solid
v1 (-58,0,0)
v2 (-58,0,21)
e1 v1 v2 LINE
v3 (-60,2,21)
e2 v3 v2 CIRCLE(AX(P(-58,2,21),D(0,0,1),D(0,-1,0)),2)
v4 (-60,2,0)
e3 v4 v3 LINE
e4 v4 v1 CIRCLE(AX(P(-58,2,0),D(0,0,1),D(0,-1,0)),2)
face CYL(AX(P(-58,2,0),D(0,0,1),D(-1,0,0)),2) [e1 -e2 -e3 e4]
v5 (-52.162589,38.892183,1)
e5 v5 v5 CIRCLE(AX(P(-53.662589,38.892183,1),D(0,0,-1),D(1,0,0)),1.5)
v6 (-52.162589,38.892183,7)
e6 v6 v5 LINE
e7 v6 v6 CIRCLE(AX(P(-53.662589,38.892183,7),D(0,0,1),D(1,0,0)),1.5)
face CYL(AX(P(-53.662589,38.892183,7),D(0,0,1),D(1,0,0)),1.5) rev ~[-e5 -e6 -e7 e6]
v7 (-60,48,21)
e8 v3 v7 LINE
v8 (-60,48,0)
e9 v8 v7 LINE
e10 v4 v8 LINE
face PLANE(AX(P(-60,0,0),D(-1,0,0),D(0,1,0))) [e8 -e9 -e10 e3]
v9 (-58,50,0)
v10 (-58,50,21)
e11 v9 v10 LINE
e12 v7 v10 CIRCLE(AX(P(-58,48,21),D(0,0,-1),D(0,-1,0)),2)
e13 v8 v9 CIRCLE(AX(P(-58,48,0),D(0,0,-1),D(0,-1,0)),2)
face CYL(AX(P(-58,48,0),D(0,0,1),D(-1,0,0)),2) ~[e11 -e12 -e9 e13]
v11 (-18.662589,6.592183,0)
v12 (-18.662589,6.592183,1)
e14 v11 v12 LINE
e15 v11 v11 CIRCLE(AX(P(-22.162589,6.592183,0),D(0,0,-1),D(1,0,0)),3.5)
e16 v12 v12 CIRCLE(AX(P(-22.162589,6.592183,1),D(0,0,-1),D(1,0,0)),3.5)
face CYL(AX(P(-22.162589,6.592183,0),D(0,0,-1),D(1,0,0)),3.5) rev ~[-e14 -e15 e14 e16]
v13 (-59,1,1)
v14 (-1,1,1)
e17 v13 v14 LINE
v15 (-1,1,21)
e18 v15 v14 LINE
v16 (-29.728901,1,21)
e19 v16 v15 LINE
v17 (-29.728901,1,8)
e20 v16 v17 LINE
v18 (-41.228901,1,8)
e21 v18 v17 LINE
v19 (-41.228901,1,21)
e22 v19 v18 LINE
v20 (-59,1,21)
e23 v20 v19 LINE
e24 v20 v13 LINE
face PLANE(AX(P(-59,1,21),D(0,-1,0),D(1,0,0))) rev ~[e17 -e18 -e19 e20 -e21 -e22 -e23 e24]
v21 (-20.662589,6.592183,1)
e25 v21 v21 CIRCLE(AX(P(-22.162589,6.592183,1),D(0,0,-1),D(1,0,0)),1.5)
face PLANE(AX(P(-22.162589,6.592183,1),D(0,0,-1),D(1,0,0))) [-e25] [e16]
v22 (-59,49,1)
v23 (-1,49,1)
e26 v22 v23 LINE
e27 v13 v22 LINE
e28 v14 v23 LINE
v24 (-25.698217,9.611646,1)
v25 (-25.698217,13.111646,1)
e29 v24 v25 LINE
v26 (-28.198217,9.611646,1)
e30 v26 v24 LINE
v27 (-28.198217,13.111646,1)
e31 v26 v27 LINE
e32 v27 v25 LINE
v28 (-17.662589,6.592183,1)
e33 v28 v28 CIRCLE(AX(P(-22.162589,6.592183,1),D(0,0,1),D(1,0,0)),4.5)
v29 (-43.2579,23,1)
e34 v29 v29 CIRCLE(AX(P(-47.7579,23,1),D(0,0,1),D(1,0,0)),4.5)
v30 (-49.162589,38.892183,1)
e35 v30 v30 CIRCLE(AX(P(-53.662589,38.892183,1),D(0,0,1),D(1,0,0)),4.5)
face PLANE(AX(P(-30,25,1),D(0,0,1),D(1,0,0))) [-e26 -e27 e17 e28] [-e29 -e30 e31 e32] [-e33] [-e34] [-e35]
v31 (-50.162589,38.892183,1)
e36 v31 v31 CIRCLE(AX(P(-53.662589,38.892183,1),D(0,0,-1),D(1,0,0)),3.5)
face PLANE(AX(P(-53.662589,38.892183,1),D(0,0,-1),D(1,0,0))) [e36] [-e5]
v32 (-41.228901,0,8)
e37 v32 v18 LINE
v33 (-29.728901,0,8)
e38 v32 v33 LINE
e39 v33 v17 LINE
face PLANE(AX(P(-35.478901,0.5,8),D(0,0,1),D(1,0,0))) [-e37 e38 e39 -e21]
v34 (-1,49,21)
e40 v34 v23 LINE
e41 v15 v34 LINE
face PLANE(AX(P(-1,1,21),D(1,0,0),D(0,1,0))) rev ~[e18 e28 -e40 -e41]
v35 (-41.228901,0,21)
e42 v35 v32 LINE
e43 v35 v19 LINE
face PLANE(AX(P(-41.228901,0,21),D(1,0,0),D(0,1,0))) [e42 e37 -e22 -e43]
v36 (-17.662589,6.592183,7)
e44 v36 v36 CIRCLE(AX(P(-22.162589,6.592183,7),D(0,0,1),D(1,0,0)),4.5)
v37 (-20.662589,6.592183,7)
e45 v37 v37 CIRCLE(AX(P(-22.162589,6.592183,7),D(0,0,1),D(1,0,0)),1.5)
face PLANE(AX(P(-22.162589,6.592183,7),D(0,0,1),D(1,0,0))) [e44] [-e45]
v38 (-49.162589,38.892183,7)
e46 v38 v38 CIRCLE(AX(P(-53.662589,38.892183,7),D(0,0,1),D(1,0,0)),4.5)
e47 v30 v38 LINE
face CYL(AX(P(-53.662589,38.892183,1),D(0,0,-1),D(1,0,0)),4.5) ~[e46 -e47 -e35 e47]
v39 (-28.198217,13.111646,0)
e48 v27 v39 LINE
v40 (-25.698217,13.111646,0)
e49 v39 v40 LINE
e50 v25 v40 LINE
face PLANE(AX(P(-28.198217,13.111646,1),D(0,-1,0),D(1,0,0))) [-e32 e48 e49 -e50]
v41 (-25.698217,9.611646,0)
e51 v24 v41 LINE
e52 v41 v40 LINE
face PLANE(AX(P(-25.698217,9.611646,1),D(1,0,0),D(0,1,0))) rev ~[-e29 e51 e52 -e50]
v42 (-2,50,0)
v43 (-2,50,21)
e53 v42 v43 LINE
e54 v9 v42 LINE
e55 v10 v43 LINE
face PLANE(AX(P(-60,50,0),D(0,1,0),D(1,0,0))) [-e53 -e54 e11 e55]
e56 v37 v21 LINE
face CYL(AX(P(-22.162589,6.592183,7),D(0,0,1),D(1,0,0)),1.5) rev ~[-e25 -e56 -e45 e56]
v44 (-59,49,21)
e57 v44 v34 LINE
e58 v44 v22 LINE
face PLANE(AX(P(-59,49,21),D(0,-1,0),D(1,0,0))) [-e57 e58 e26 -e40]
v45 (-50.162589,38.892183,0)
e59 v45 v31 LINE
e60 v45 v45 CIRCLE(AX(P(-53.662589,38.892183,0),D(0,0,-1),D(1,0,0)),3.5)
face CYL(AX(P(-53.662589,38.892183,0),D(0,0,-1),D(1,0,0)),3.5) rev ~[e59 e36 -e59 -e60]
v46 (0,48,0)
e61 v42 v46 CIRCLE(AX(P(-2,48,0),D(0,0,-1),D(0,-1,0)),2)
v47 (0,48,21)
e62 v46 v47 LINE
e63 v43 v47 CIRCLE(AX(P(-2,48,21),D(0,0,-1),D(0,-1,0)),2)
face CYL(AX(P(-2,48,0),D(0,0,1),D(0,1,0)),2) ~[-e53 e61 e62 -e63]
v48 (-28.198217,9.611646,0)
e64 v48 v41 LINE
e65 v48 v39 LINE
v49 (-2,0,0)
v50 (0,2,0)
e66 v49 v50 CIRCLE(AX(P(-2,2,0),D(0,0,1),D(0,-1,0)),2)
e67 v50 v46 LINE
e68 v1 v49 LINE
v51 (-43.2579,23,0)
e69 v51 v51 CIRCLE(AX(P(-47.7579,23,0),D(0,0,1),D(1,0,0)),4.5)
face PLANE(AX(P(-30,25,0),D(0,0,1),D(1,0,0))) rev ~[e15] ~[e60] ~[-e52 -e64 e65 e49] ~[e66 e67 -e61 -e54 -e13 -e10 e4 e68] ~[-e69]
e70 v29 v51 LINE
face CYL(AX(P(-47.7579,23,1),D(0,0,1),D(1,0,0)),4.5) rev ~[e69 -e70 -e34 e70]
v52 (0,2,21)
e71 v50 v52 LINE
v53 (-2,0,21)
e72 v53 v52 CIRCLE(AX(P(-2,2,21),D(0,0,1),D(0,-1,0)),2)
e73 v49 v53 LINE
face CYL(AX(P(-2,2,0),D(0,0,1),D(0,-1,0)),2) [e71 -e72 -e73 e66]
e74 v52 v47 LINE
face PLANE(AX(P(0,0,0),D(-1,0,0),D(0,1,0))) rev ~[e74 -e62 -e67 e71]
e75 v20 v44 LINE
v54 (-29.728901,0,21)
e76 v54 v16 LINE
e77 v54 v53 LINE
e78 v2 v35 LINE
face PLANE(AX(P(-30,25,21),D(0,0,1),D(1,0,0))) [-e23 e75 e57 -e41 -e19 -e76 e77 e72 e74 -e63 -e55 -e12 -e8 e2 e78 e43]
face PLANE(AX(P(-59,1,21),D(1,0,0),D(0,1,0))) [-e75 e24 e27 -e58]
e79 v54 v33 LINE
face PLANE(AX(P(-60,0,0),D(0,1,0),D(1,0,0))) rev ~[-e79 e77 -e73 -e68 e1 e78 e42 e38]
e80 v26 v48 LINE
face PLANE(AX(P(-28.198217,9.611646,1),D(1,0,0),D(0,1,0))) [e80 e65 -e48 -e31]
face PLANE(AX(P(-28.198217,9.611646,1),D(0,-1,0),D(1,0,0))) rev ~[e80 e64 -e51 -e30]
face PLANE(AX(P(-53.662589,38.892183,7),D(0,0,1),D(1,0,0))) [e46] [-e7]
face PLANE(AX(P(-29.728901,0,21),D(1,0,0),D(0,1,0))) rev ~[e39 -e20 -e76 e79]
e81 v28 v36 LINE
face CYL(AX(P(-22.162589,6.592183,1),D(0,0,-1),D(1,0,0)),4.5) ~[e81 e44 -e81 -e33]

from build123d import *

# Parameters (mm, degrees)
F0_W      = 60
F0_H      = 50
F1_DEPTH  = 21
F2_W      = 58
F2_H      = 48
F3_DEPTH  = 20
F5_R      = 2
F6_R      = 4.5
F7_DEPTH  = 6
F10_W     = 11.5
F10_H     = 1
F11_DEPTH = 13
F12_W     = 2.5
F12_H     = 3.5
F13_DEPTH = 1
F14_R     = 4.5
F15_DEPTH = 1
F8_R      = 1.5
F16_DEPTH = 7
F9_R      = 1.5
F17_DEPTH = 7
F18_R     = 3.5
F18_R_2   = 1.5
F19_DEPTH = 1


with BuildPart() as f1:
    # F0 (on Top) → F1 (new body)
    with BuildSketch(Plane.XY):
        with Locations((-30, 25)):
            Rectangle(F0_W, F0_H)
    extrude(amount=F1_DEPTH)

    # F2 (on face) → F3 (cut)
    with BuildSketch(Plane.XY.offset(21)):
        with Locations((-30, 25)):
            Rectangle(F2_W, F2_H)
    extrude(amount=-F3_DEPTH, mode=Mode.SUBTRACT)

    # F5
    f5_edges = [f1.edges().sort_by_distance(p)[0] for p in [
        (-60, 50, 10.5),
        (0, 50, 10.5),
        (0, 0, 10.5),
        (-60, 0, 10.5),
    ]]
    fillet(f5_edges, radius=F5_R)

    # F6 (on face) → F7 (join)
    with BuildSketch(Plane.XY.offset(1)):
        with Locations((-22.1625890434, 6.5921834528)):
            Circle(F6_R)
        with Locations((-53.6625890434, 38.8921834528)):
            Circle(F6_R)
    extrude(amount=F7_DEPTH)

    # F10 (on face) → F11 (cut)
    with BuildSketch(Plane.XY.offset(21)):
        with Locations((-35.4789009094, 0.5)):
            Rectangle(F10_W, F10_H)
    extrude(amount=-F11_DEPTH, mode=Mode.SUBTRACT)

    # F12 (on face) → F13 (cut)
    with BuildSketch(Plane.XY.offset(1)):
        with Locations((-26.94821703, 11.3616460413)):
            Rectangle(F12_W, F12_H)
    extrude(amount=-F13_DEPTH, mode=Mode.SUBTRACT)

    # F14 (on face) → F15 (cut)
    with BuildSketch(Plane.XY.offset(1)):
        with Locations((-47.7578996122, 23)):
            Circle(F14_R)
    extrude(amount=-F15_DEPTH, mode=Mode.SUBTRACT)

    # F8 (on face) → F16 (cut)
    with BuildSketch(Plane.XY.offset(7)):
        with Locations((-53.6625890434, 38.8921834528)):
            Circle(F8_R)
    extrude(amount=-F16_DEPTH, mode=Mode.SUBTRACT)

    # F9 (on face) → F17 (cut)
    with BuildSketch(Plane.XY.offset(7)):
        with Locations((-22.1625890434, 6.5921834528)):
            Circle(F9_R)
    extrude(amount=-F17_DEPTH, mode=Mode.SUBTRACT)

    # F18 (on face) → F19 (cut)
    with BuildSketch(Plane(origin=(0, 0, 0), x_dir=(1, 0, 0), z_dir=(0, 0, -1))):
        with Locations((-22.1625890434, -6.5921834528)):
            Circle(F18_R)
        with Locations((-22.1625890434, -6.5921834528)):
            Circle(F18_R_2, mode=Mode.SUBTRACT)
        with Locations((-53.6625890434, -38.8921834528)):
            Circle(F18_R)
        with Locations((-53.6625890434, -38.8921834528)):
            Circle(F18_R_2, mode=Mode.SUBTRACT)
    extrude(amount=-F19_DEPTH, mode=Mode.SUBTRACT)


solid = f1.part
